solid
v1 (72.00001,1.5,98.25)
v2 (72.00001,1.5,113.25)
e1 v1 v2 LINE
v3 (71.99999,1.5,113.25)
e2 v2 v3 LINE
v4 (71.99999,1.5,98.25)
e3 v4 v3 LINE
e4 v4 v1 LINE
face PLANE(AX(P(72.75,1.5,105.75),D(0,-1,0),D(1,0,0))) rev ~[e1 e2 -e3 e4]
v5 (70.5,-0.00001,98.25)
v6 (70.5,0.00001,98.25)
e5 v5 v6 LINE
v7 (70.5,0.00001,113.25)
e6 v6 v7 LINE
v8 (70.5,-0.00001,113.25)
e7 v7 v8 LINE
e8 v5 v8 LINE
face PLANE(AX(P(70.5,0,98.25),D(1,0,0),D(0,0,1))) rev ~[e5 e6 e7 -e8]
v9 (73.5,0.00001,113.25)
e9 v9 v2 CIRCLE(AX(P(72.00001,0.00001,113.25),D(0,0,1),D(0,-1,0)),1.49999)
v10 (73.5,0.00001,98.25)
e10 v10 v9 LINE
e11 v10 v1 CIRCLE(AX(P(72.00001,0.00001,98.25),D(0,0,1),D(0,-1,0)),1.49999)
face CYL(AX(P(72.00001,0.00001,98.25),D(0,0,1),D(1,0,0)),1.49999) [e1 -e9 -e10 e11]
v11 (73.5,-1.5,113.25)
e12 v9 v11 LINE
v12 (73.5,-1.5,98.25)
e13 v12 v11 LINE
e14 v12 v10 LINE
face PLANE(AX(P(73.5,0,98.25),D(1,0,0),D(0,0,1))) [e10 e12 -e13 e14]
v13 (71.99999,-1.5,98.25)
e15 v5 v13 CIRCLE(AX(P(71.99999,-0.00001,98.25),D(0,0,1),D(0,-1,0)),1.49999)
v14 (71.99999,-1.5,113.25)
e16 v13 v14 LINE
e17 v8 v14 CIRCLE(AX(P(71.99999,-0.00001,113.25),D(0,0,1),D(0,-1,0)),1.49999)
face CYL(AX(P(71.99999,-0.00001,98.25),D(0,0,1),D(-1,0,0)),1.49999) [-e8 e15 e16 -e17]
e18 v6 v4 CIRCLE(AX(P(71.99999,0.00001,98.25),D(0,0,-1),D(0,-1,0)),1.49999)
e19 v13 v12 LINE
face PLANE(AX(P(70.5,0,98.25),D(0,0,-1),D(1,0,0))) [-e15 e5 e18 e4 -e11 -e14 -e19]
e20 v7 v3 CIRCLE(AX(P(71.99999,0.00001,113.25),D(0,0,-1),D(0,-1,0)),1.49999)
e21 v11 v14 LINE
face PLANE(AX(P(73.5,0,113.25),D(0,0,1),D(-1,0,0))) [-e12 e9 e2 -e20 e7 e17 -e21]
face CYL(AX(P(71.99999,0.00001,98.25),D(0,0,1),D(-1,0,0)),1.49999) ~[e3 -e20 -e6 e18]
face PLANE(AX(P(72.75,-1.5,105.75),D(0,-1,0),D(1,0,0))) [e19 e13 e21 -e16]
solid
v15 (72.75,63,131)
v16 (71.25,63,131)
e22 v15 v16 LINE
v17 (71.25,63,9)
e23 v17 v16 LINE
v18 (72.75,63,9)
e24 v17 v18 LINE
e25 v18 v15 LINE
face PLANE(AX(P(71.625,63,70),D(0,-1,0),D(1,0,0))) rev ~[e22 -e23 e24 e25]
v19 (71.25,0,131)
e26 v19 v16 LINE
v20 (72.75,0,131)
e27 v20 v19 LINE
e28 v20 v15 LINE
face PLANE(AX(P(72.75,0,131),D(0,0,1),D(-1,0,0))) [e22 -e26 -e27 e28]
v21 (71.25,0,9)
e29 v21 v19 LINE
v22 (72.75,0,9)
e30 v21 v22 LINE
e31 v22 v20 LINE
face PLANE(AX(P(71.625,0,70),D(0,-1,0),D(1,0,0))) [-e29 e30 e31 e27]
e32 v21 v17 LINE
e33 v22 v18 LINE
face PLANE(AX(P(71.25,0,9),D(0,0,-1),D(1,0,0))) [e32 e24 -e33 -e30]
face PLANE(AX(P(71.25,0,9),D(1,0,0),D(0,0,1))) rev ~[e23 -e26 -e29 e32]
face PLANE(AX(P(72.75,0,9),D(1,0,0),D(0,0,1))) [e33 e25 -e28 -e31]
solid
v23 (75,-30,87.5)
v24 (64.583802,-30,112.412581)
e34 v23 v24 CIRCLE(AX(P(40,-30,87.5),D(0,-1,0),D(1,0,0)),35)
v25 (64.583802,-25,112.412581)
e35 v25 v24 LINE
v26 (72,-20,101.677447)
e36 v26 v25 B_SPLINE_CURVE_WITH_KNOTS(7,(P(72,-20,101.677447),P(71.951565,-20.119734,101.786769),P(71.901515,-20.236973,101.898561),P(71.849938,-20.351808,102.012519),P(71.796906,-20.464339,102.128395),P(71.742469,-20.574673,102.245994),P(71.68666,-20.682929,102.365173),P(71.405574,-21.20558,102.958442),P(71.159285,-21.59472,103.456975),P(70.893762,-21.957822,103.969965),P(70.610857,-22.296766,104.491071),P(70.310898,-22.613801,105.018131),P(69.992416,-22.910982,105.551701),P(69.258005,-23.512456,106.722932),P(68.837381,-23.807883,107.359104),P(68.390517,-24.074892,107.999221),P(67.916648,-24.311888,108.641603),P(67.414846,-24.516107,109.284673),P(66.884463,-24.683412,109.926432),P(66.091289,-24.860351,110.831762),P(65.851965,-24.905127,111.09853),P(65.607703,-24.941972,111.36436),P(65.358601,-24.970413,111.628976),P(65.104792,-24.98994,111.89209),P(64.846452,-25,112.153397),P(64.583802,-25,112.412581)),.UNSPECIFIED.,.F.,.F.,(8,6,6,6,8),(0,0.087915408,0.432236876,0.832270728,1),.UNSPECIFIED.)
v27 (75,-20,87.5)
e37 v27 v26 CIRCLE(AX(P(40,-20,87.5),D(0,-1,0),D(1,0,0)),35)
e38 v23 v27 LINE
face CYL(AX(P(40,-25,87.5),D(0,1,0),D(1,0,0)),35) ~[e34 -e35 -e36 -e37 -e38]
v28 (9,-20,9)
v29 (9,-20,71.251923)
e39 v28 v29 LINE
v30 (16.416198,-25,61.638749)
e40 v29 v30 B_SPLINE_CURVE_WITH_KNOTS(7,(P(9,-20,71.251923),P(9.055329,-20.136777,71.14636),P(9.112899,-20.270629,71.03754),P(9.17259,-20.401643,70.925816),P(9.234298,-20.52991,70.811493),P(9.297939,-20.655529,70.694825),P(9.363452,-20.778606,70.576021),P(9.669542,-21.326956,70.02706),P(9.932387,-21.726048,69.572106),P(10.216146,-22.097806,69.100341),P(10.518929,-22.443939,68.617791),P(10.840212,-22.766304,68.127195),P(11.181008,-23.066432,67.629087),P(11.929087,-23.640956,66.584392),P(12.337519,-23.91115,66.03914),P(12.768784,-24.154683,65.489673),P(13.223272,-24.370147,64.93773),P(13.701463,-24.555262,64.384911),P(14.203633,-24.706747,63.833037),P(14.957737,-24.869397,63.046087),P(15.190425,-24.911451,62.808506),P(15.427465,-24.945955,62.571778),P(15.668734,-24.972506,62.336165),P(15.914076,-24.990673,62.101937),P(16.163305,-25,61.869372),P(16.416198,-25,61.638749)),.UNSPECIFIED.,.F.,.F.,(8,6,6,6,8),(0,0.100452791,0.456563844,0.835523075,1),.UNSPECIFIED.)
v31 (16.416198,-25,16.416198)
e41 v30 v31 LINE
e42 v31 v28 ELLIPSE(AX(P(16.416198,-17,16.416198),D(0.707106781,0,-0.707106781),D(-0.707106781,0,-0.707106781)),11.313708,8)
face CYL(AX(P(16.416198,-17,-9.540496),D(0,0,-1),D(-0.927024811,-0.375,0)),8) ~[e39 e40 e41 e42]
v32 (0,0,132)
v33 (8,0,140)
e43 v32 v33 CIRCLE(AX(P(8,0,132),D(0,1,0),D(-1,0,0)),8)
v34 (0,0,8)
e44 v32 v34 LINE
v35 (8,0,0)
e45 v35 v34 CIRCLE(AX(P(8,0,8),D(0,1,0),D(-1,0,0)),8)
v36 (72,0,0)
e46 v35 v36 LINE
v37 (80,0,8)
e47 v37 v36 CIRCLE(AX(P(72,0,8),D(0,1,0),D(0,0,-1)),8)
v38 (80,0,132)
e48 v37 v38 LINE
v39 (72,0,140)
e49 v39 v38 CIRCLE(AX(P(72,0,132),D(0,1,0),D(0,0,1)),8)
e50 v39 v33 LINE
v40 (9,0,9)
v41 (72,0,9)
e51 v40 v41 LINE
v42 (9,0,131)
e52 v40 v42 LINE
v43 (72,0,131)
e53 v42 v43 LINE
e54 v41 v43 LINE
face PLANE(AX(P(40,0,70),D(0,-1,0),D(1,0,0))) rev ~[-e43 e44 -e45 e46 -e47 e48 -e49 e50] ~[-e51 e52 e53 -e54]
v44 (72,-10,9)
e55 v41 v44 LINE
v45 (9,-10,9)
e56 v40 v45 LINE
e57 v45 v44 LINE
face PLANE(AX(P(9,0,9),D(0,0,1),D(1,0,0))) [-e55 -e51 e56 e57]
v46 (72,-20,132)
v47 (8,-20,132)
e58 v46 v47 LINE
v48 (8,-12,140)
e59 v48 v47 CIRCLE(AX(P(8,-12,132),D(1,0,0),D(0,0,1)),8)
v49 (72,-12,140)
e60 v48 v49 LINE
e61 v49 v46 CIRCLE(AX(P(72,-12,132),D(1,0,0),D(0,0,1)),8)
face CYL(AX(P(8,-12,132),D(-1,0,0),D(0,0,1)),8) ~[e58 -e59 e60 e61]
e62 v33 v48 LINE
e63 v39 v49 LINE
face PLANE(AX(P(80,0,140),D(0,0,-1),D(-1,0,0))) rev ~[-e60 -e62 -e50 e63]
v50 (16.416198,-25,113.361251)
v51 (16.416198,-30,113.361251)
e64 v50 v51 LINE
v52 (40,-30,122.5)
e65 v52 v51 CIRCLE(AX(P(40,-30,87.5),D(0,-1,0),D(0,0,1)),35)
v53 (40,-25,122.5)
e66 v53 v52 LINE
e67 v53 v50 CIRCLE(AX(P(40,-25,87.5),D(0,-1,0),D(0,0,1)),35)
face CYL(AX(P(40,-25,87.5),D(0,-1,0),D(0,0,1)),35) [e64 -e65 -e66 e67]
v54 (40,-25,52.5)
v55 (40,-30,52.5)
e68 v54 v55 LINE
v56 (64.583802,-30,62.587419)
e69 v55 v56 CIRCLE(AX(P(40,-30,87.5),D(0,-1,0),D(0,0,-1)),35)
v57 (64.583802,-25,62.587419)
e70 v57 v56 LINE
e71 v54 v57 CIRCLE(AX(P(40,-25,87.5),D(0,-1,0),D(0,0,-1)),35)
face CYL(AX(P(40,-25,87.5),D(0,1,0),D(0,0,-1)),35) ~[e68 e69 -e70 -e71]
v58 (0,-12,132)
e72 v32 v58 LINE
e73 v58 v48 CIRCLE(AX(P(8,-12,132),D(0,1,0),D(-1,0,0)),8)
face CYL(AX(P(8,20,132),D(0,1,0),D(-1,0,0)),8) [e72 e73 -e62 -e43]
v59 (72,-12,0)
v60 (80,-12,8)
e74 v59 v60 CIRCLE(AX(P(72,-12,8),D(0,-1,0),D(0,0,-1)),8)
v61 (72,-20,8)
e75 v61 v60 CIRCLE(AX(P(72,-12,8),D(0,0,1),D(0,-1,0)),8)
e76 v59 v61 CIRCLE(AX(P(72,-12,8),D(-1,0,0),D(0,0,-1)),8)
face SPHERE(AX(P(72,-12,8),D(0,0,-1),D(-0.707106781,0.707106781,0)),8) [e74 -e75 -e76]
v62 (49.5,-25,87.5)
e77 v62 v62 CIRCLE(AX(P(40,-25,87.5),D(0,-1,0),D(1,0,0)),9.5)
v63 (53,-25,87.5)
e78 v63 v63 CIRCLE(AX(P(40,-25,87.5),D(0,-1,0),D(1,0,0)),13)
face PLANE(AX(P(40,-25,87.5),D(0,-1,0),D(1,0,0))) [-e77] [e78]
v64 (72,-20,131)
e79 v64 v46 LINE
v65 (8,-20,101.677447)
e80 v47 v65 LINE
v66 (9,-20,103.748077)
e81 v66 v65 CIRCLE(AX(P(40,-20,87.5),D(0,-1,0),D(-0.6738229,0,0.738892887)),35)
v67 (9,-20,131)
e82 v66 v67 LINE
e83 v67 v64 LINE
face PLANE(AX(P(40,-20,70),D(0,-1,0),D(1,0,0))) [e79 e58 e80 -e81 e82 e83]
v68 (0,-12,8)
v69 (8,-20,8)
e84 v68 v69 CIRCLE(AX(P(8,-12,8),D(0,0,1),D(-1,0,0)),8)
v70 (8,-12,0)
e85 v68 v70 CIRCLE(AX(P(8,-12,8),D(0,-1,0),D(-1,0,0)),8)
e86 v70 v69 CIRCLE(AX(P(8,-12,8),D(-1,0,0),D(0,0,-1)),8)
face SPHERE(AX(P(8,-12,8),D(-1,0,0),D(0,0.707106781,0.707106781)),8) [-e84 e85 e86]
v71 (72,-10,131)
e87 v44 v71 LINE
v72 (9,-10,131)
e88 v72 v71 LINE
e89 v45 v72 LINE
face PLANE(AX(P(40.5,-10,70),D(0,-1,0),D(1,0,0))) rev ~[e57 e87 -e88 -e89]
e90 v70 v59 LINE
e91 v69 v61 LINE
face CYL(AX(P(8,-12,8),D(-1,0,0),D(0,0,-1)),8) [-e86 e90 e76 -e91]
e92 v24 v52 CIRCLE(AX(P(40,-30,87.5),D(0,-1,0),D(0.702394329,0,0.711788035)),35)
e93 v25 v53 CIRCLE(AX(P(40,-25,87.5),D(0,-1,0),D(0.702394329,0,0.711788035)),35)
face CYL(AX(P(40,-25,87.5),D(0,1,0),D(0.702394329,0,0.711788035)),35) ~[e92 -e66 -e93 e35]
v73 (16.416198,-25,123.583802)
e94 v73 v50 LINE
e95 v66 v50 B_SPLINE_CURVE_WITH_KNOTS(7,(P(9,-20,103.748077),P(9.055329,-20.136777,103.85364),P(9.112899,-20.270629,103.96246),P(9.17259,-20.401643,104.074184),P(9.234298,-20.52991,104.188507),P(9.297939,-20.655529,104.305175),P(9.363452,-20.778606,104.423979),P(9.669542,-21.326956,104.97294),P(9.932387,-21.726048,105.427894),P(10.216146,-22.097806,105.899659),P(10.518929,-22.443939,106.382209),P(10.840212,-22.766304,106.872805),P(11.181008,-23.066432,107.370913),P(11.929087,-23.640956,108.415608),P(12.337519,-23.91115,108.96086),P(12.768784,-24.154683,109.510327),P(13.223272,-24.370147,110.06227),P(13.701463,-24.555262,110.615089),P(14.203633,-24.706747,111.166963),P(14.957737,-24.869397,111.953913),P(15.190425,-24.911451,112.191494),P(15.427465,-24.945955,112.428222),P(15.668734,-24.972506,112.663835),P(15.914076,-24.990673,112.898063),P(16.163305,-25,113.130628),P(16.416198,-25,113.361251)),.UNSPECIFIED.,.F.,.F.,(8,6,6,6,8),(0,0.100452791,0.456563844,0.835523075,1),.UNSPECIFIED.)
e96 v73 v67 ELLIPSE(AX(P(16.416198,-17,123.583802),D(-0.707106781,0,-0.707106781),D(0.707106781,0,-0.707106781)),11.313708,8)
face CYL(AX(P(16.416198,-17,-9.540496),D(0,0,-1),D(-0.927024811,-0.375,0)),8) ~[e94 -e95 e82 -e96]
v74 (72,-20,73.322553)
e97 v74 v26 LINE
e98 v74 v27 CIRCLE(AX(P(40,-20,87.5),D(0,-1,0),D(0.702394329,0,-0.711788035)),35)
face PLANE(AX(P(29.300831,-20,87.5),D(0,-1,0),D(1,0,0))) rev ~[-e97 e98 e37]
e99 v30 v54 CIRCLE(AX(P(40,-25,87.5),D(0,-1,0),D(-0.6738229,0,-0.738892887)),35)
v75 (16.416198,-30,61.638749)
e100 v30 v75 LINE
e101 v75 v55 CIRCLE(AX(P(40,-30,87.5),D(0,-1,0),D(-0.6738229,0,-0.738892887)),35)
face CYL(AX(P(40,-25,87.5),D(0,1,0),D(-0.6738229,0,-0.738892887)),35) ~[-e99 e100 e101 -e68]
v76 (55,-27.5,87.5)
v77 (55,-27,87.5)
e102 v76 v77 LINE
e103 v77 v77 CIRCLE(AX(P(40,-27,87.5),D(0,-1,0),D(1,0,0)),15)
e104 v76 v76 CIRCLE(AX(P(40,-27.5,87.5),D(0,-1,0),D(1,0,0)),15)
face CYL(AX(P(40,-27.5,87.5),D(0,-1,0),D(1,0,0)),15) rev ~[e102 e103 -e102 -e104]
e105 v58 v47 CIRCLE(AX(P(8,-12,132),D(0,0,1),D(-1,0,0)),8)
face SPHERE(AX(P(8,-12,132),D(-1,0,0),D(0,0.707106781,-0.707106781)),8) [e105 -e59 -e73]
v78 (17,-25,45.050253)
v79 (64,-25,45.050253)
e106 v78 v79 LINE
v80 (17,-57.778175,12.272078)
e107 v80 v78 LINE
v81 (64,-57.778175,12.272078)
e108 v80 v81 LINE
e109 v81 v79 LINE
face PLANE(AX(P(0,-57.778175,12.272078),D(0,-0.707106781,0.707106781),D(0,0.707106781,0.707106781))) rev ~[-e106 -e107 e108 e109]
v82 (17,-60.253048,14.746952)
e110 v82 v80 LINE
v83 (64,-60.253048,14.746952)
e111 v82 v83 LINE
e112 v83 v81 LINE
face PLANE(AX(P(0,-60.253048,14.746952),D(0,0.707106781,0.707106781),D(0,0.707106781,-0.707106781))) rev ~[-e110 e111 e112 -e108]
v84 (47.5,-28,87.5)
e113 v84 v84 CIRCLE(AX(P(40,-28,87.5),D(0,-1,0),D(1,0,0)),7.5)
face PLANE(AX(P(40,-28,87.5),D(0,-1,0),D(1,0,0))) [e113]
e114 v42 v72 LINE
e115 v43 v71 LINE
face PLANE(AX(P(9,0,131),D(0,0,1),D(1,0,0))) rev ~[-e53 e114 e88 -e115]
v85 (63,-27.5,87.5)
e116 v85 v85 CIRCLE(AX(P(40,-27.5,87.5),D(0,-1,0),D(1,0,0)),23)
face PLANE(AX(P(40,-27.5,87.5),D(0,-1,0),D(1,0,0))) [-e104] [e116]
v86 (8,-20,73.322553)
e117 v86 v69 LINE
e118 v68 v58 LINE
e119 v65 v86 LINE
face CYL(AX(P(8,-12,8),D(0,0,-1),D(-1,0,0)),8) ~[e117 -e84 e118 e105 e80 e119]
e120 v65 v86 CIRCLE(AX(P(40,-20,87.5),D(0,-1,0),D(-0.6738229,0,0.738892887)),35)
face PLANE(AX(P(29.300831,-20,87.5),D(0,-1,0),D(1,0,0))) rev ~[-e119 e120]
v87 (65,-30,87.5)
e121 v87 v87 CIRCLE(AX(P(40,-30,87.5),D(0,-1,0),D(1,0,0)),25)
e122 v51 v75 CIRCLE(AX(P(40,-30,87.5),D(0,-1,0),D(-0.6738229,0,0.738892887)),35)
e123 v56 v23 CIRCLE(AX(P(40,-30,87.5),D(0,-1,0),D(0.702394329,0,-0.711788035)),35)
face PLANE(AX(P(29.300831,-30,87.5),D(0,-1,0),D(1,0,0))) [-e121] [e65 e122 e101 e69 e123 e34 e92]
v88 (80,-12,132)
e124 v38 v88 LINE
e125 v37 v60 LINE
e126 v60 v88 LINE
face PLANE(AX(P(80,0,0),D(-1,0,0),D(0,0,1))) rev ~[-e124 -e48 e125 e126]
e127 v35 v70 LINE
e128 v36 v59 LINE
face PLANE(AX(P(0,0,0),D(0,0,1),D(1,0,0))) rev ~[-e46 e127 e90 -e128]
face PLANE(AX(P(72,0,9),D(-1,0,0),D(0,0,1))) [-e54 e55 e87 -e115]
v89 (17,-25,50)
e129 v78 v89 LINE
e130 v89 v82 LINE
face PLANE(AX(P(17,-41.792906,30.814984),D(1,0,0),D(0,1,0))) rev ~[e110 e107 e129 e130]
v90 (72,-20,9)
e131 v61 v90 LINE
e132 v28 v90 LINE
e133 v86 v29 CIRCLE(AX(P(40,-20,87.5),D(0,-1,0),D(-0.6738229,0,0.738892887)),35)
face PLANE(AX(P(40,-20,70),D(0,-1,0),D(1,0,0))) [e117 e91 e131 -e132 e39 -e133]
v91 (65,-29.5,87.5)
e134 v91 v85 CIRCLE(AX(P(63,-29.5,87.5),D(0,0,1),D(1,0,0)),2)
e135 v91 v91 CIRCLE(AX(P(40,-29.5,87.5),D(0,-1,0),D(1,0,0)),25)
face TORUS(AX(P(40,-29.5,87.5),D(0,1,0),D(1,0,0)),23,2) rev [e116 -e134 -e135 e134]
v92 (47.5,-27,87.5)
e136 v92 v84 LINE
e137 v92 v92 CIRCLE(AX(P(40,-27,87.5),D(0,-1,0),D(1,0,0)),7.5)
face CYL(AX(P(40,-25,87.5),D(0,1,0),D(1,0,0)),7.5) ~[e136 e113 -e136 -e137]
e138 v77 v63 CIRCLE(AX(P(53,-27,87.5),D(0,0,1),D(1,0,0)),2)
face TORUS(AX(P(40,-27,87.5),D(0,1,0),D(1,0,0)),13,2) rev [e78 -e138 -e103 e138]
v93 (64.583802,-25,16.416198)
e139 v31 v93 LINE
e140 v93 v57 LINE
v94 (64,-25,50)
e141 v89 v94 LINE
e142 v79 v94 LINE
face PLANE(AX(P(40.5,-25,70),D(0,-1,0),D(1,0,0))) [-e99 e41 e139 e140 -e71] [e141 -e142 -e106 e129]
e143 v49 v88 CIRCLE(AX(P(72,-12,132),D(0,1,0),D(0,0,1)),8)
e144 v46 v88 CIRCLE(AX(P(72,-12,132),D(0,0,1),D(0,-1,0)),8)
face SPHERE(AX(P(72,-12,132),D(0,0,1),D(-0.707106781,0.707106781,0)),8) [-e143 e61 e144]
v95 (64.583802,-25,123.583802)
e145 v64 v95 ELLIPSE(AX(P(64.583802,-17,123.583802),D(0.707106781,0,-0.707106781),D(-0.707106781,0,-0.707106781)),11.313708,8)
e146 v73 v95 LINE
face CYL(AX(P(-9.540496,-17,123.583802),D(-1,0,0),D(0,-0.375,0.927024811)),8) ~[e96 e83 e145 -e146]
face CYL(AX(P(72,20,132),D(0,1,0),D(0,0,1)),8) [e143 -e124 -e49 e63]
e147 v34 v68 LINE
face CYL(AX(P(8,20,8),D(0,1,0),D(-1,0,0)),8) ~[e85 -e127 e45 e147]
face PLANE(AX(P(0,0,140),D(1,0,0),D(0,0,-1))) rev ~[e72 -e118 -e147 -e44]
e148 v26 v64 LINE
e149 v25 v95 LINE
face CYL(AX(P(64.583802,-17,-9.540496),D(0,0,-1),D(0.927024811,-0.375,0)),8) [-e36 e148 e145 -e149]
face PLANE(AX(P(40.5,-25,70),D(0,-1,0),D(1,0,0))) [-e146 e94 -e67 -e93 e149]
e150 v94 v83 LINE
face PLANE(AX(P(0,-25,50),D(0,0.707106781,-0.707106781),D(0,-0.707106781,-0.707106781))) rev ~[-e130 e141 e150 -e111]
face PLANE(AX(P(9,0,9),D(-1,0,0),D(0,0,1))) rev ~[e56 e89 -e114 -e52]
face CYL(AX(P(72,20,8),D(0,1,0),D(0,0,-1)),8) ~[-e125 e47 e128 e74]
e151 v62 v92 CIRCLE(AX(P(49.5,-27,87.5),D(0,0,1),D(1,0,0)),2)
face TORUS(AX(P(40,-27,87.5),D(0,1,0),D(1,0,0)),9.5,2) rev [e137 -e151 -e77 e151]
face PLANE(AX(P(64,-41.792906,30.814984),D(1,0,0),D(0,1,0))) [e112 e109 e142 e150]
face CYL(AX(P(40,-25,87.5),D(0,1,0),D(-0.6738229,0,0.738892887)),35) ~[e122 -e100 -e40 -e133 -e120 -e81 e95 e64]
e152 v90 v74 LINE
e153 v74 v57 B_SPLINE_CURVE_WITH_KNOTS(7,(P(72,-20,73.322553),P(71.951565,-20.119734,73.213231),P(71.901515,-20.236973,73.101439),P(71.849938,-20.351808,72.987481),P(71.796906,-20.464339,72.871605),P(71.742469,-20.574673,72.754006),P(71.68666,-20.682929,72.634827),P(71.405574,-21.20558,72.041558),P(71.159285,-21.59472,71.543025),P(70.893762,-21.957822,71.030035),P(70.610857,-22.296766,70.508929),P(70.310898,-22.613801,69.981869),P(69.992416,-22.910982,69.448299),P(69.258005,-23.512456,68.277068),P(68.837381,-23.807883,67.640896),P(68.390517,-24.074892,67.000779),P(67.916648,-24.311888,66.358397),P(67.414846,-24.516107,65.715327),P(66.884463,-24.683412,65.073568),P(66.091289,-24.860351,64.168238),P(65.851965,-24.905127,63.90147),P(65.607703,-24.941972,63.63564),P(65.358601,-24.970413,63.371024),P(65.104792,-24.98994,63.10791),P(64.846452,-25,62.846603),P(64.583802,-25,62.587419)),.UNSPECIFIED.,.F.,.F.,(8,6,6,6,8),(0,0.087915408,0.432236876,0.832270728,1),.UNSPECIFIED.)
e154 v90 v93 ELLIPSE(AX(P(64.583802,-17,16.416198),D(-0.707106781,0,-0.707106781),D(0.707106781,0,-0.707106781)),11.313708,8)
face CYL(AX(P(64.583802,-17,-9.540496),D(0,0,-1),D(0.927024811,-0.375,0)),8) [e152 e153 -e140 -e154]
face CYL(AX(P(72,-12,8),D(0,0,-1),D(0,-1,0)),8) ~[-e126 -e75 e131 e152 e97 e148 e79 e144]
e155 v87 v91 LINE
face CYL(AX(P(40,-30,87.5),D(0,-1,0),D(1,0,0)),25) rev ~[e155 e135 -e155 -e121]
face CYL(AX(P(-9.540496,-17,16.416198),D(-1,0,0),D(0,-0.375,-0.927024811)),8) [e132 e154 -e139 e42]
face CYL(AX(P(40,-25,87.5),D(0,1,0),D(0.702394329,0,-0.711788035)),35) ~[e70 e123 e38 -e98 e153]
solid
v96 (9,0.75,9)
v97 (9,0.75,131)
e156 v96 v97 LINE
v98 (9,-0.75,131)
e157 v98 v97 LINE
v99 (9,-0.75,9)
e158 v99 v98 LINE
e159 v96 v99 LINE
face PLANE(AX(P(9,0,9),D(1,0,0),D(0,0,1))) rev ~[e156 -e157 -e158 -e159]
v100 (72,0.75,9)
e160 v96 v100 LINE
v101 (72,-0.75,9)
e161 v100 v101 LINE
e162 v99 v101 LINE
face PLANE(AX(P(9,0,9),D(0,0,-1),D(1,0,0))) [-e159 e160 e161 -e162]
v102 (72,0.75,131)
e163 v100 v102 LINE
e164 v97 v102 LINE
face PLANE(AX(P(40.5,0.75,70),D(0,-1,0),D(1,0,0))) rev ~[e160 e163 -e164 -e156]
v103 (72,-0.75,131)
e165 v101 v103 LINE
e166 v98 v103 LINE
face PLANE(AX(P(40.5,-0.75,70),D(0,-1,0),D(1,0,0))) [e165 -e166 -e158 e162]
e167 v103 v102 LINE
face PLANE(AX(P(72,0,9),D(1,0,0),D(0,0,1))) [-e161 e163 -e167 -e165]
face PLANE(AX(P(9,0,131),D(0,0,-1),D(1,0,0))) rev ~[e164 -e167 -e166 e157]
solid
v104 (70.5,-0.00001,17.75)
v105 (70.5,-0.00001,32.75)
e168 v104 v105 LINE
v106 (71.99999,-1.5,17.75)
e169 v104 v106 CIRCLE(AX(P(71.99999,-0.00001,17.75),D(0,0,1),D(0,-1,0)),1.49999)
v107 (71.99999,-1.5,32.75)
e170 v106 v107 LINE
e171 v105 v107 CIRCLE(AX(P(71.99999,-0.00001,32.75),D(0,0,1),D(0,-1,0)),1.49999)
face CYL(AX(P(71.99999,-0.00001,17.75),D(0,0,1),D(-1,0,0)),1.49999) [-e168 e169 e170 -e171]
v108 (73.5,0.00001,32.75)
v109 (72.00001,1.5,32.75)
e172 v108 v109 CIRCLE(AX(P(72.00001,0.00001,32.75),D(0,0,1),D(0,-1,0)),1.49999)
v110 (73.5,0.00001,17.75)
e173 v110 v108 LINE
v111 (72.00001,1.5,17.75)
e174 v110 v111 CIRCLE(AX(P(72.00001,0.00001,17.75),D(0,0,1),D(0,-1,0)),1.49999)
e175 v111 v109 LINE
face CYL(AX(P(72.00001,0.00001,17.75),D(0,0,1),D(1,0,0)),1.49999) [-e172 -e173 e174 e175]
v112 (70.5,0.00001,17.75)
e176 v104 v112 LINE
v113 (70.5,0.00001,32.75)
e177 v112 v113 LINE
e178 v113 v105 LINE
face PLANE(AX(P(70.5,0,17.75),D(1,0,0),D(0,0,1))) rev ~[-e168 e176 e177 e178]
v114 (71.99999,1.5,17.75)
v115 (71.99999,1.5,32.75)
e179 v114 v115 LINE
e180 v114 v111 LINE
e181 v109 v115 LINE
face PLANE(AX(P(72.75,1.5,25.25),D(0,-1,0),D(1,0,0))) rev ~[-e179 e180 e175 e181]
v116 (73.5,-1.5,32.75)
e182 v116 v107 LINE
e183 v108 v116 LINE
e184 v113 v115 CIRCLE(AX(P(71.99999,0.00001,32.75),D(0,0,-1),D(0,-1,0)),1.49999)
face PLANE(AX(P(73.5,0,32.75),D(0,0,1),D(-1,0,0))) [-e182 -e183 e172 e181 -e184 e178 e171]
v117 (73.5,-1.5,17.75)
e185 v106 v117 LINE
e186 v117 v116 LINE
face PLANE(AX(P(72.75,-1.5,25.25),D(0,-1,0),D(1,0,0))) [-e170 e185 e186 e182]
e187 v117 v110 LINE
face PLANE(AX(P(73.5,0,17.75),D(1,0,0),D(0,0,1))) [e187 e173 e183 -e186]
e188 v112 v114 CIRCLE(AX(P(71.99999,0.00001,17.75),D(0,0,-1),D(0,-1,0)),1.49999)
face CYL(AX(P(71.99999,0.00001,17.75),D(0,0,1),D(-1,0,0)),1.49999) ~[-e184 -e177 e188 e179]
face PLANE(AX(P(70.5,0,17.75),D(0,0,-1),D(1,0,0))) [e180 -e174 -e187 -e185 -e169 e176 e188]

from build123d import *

# Parameters (mm, degrees)
F0_W         = 63
F0_H         = 122
F1_DEPTH     = 20
F2_DEPTH     = 25
F3_DEPTH     = 10
F4_T1_DEPTH  = 32
F4_T3_DEPTH  = 64
F4_T5_DEPTH  = 124
F4_T7_DEPTH  = 159.0809924355
F4_T9_DEPTH  = 100.0809924355
F4_S13_W     = 8.16
F4_S13_H     = 8.16
F4_T14_DEPTH = 8.16
F4_S19_W     = 8.16
F4_S19_H     = 8.16
F4_T20_DEPTH = 8.16
F4_S25_W     = 8.16
F4_S25_H     = 8.16
F4_T26_DEPTH = 8.16
F4_S31_W     = 8.16
F4_S31_H     = 8.16
F4_T32_DEPTH = 8.16
F5_W         = 1.5
F5_H         = 15
F6_DEPTH     = 1.5
F7_R         = 1.49999
F7_2_R       = 1.49999
F8_W         = 0.75
F8_H         = 122
F9_DEPTH     = 63
F10_W        = 63
F10_H        = 122
F11_DEPTH    = 0.75
F13_DEPTH    = 64
F14_DEPTH    = 17
F16_DEPTH    = 5
F17_R        = 25
F18_DEPTH    = 2.5
F19_R        = 15
F20_DEPTH    = 2.5
F21_R        = 7.5
F22_DEPTH    = 3
F23_R        = 2


# Not quite as in the source:
# - a fillet or chamfer that OpenCascade refuses, or shapes differently, is made with other operations: its cross-section is extruded or revolved along the edge and cut away or added
# - a fillet or chamfer is up to 0.001 mm smaller than in the source, because OpenCascade refuses the exact size


with BuildPart() as f1:
    # F0 (on Front) → F1 (new body)
    with BuildSketch(Plane.XZ):
        Polygon((0, 140), (0, 0), (9, 0), (80, 0), (80, 140), align=None)
        with Locations((40.5, 70)):
            Rectangle(F0_W, F0_H, mode=Mode.SUBTRACT)
    extrude(amount=F1_DEPTH)

    # F0 (on Front) → F2 (join)
    with BuildSketch(Plane.XZ):
        with Locations((40.5, 70)):
            Rectangle(F0_W, F0_H)
    extrude(amount=F2_DEPTH)

    # F0 (on Front) → F3 (cut)
    with BuildSketch(Plane.XZ):
        with Locations((40.5, 70)):
            Rectangle(F0_W, F0_H)
    extrude(amount=F3_DEPTH, mode=Mode.SUBTRACT)

    # F4: fillet of radius 8 on 12 edges, made by hand

    # F4_s2 → F4_t1 (cut)
    with BuildSketch(Plane.XZ.offset(-20)):
        with BuildLine():
            ThreePointArc((0, 8), (2.3431457505, 2.3431457505), (8, 0))
            Line((8, 0), (8, -0.16))
            Line((8, -0.16), (-0.16, -0.16))
            Line((-0.16, -0.16), (-0.16, 8))
            Line((-0.16, 8), (0, 8))
        make_face()
        with BuildLine():
            ThreePointArc((72, 0), (77.6568542495, 2.3431457505), (80, 8))
            Line((80, 8), (80.16, 8))
            Line((80.16, 8), (80.16, -0.16))
            Line((80.16, -0.16), (72, -0.16))
            Line((72, -0.16), (72, 0))
        make_face()
        with BuildLine():
            ThreePointArc((0, 132), (2.3431457505, 137.6568542495), (8, 140))
            Line((8, 140), (8, 140.16))
            Line((8, 140.16), (-0.16, 140.16))
            Line((-0.16, 140.16), (-0.16, 132))
            Line((-0.16, 132), (0, 132))
        make_face()
        with BuildLine():
            ThreePointArc((72, 140), (77.6568542495, 137.6568542495), (80, 132))
            Line((80, 132), (80.16, 132))
            Line((80.16, 132), (80.16, 140.16))
            Line((80.16, 140.16), (72, 140.16))
            Line((72, 140.16), (72, 140))
        make_face()
    extrude(amount=F4_T1_DEPTH, mode=Mode.SUBTRACT)

    # F4_s4 → F4_t3 (cut)
    with BuildSketch(Plane.YZ.offset(8)):
        with BuildLine():
            ThreePointArc((-12, 140), (-17.6568542495, 137.6568542495), (-20, 132))
            Line((-20, 132), (-20.16, 132))
            Line((-20.16, 132), (-20.16, 140.16))
            Line((-20.16, 140.16), (-12, 140.16))
            Line((-12, 140.16), (-12, 140))
        make_face()
        with BuildLine():
            ThreePointArc((-12, 0), (-17.6568542495, 2.3431457505), (-20, 8))
            Line((-20, 8), (-20.16, 8))
            Line((-20.16, 8), (-20.16, -0.16))
            Line((-20.16, -0.16), (-12, -0.16))
            Line((-12, -0.16), (-12, 0))
        make_face()
    extrude(amount=F4_T3_DEPTH, mode=Mode.SUBTRACT)

    # F4_s6 → F4_t5 (cut)
    with BuildSketch(Plane.XY.offset(8)):
        with BuildLine():
            ThreePointArc((0, -12), (2.3431457505, -17.6568542495), (8, -20))
            Line((8, -20), (8, -20.16))
            Line((8, -20.16), (-0.16, -20.16))
            Line((-0.16, -20.16), (-0.16, -12))
            Line((-0.16, -12), (0, -12))
        make_face()
        with BuildLine():
            ThreePointArc((72, -20), (77.6568542495, -17.6568542495), (80, -12))
            Line((80, -12), (80.16, -12))
            Line((80.16, -12), (80.16, -20.16))
            Line((80.16, -20.16), (72, -20.16))
            Line((72, -20.16), (72, -20))
        make_face()
    extrude(amount=F4_T5_DEPTH, mode=Mode.SUBTRACT)

    # F4_s8 → F4_t7 (cut)
    with BuildSketch(Plane.XY.offset(-9.5404962177)):
        with BuildLine():
            ThreePointArc((72, -20), (69.0559374679, -23.6332495807), (64.5838015129, -25))
            Line((64.5838015129, -25), (64.5838015129, -25.16))
            Line((64.5838015129, -25.16), (72, -25.16))
            Line((72, -25.16), (72.16, -25))
            ThreePointArc((72.16, -25), (72.16, -22.5), (72.1483239697, -20.06))
            Line((72.1483239697, -20.06), (72, -20))
        make_face()
        with BuildLine():
            ThreePointArc((9, -20), (11.9440625321, -23.6332495807), (16.4161984871, -25))
            Line((16.4161984871, -25), (16.4161984871, -25.16))
            Line((16.4161984871, -25.16), (9, -25.16))
            Line((9, -25.16), (8.84, -25))
            ThreePointArc((8.84, -25), (8.84, -22.5), (8.8516760303, -20.06))
            Line((8.8516760303, -20.06), (9, -20))
        make_face()
    extrude(amount=F4_T7_DEPTH, mode=Mode.SUBTRACT)

    # F4_s10 → F4_t9 (cut)
    with BuildSketch(Plane.YZ.offset(-9.5404962177)):
        with BuildLine():
            ThreePointArc((-20, 131), (-23.6332495807, 128.0559374679), (-25, 123.5838015129))
            Line((-25, 123.5838015129), (-25.16, 123.5838015129))
            Line((-25.16, 123.5838015129), (-25.16, 131))
            Line((-25.16, 131), (-25, 131.16))
            ThreePointArc((-25, 131.16), (-22.5, 131.16), (-20.06, 131.1483239697))
            Line((-20.06, 131.1483239697), (-20, 131))
        make_face()
        with BuildLine():
            ThreePointArc((-20, 9), (-23.6332495807, 11.9440625321), (-25, 16.4161984871))
            Line((-25, 16.4161984871), (-25.16, 16.4161984871))
            Line((-25.16, 16.4161984871), (-25.16, 9))
            Line((-25.16, 9), (-25, 8.84))
            ThreePointArc((-25, 8.84), (-22.5, 8.84), (-20.06, 8.8516760303))
            Line((-20.06, 8.8516760303), (-20, 9))
        make_face()
    extrude(amount=F4_T9_DEPTH, mode=Mode.SUBTRACT)


with BuildPart() as f4_tool12:
    # F4_s13 → F4_t14 (new body)
    with BuildSketch(Plane.YZ.offset(8)):
        with Locations((-16.08, 3.92)):
            Rectangle(F4_S13_W, F4_S13_H)
    extrude(amount=-F4_T14_DEPTH)

    # F4_s15 → F4_t16 (revolve, cut)
    with BuildSketch(Plane(origin=(8, -12, 8), x_dir=(0, 0.7071067812, 0.7071067812), z_dir=(0, -0.7071067812, 0.7071067812))):
        with BuildLine():
            ThreePointArc((0, -8), (8, 0), (0, 8))
            Line((0, 8), (0, -8))
        make_face()
    revolve(axis=Axis((8, -12, 8), (-1, 0, 0)), mode=Mode.SUBTRACT)


with BuildPart() as f1_1:
    add(f1.part)

    # F4_t11: cut F4_tool12
    add(f4_tool12.part, mode=Mode.SUBTRACT)


with BuildPart() as f4_tool18:
    # F4_s19 → F4_t20 (new body)
    with BuildSketch(Plane.XY.offset(8)):
        with Locations((76.08, -16.08)):
            Rectangle(F4_S19_W, F4_S19_H)
    extrude(amount=-F4_T20_DEPTH)

    # F4_s21 → F4_t22 (revolve, cut)
    with BuildSketch(Plane(origin=(72, -12, 8), x_dir=(-0.7071067812, 0.7071067812, 0), z_dir=(-0.7071067812, -0.7071067812, 0))):
        with BuildLine():
            ThreePointArc((0, -8), (8, 0), (0, 8))
            Line((0, 8), (0, -8))
        make_face()
    revolve(axis=Axis((72, -12, 8), (0, 0, -1)), mode=Mode.SUBTRACT)


with BuildPart() as f1_2:
    add(f1_1.part)

    # F4_t17: cut F4_tool18
    add(f4_tool18.part, mode=Mode.SUBTRACT)


with BuildPart() as f4_tool24:
    # F4_s25 → F4_t26 (new body)
    with BuildSketch(Plane.YZ.offset(8)):
        with Locations((-16.08, 136.08)):
            Rectangle(F4_S25_W, F4_S25_H)
    extrude(amount=-F4_T26_DEPTH)

    # F4_s27 → F4_t28 (revolve, cut)
    with BuildSketch(Plane(origin=(8, -12, 132), x_dir=(0, 0.7071067812, -0.7071067812), z_dir=(0, 0.7071067812, 0.7071067812))):
        with BuildLine():
            ThreePointArc((0, -8), (8, 0), (0, 8))
            Line((0, 8), (0, -8))
        make_face()
    revolve(axis=Axis((8, -12, 132), (-1, 0, 0)), mode=Mode.SUBTRACT)


with BuildPart() as f1_3:
    add(f1_2.part)

    # F4_t23: cut F4_tool24
    add(f4_tool24.part, mode=Mode.SUBTRACT)


with BuildPart() as f4_tool30:
    # F4_s31 → F4_t32 (new body)
    with BuildSketch(Plane.XY.offset(132)):
        with Locations((76.08, -16.08)):
            Rectangle(F4_S31_W, F4_S31_H)
    extrude(amount=F4_T32_DEPTH)

    # F4_s33 → F4_t34 (revolve, cut)
    with BuildSketch(Plane(origin=(72, -12, 132), x_dir=(-0.7071067812, 0.7071067812, 0), z_dir=(0.7071067812, 0.7071067812, 0))):
        with BuildLine():
            ThreePointArc((0, -8), (8, 0), (0, 8))
            Line((0, 8), (0, -8))
        make_face()
    revolve(axis=Axis((72, -12, 132), (0, 0, 1)), mode=Mode.SUBTRACT)


with BuildPart() as f1_4:
    add(f1_3.part)

    # F4_t29: cut F4_tool30
    add(f4_tool30.part, mode=Mode.SUBTRACT)

    # F12 (on Right) → F13 (join)
    with BuildSketch(Plane.YZ):
        Polygon((-57.7781745931, 12.2720779386), (-25, 45.0502525317), (-25, 50), (-50, 25), (-60.2530483272, 14.7469516728), align=None)
    extrude(amount=F13_DEPTH)

    # F14 (cut): a face of the model
    f14_faces = [f1_4.faces().sort_by_distance(p)[0] for p in [
        (0, -42.0153084126, 30.5398285833),
    ]]
    extrude(f14_faces, amount=-F14_DEPTH, mode=Mode.SUBTRACT)

    # F15 (on face) → F16 (join, symmetric)
    with BuildSketch(Plane.XZ.offset(25)):
        with BuildLine():
            Line((40, 52.5), (40, 70))
            Line((40, 70), (40, 87.5))
            Line((40, 87.5), (40, 105))
            Line((40, 105), (40, 122.5))
            ThreePointArc((40, 122.5), (27.3537315182, 120.1354392262), (16.4161984871, 113.3612510564))
            Line((16.4161984871, 113.3612510564), (16.4161984871, 61.6387489436))
            ThreePointArc((16.4161984871, 61.6387489436), (27.3537315182, 54.8645607738), (40, 52.5))
        make_face()
        with BuildLine():
            Line((40, 87.5), (40, 70))
            Line((40, 70), (40, 52.5))
            ThreePointArc((40, 52.5), (53.2864528225, 55.1199108804), (64.5838015129, 62.5874187774))
            Line((64.5838015129, 62.5874187774), (64.5838015129, 112.4125812226))
            ThreePointArc((64.5838015129, 112.4125812226), (53.2864528225, 119.8800891196), (40, 122.5))
            Line((40, 122.5), (40, 105))
            Line((40, 105), (40, 87.5))
        make_face()
        with BuildLine():
            ThreePointArc((16.4161984871, 113.3612510564), (5, 87.5), (16.4161984871, 61.6387489436))
            Line((16.4161984871, 61.6387489436), (16.4161984871, 113.3612510564))
        make_face()
        with BuildLine():
            Line((64.5838015129, 112.4125812226), (64.5838015129, 62.5874187774))
            ThreePointArc((64.5838015129, 62.5874187774), (72.2911214806, 73.9987602968), (75, 87.5))
            ThreePointArc((75, 87.5), (72.2911214806, 101.0012397032), (64.5838015129, 112.4125812226))
        make_face()
    extrude(amount=F16_DEPTH, both=True)

    # F17 (on face) → F18 (cut)
    with BuildSketch(Plane.XZ.offset(30)):
        with Locations((40, 87.5)):
            Circle(F17_R)
    extrude(amount=-F18_DEPTH, mode=Mode.SUBTRACT)

    # F19 (on face) → F20 (cut)
    with BuildSketch(Plane.XZ.offset(27.5)):
        with Locations((40, 87.5)):
            Circle(F19_R)
    extrude(amount=-F20_DEPTH, mode=Mode.SUBTRACT)

    # F21 (on face) → F22 (join)
    with BuildSketch(Plane.XZ.offset(25)):
        with Locations((40, 87.5)):
            Circle(F21_R)
    extrude(amount=F22_DEPTH)

    # F23
    f23_edges = [f1_4.edges().sort_by_distance(p)[0] for p in [
        (15, -27.5, 87.5),
        (25, -25, 87.5),
        (32.5, -25, 87.5),
    ]]
    fillet(f23_edges, radius=F23_R)


with BuildPart() as f6:
    # F5 (on face) → F6 (new body, symmetric)
    with BuildSketch(Plane.XZ):
        with Locations((72.75, 105.75)):
            Rectangle(F5_W, F5_H)
        with Locations((71.25, 105.75)):
            Rectangle(F5_W, F5_H)
    extrude(amount=F6_DEPTH, both=True)

    # F7 (radius 1.5 in the source; OpenCascade refuses exactly that, so slightly less here)
    f7_edges = [f6.edges().sort_by_distance(p)[0] for p in [
        (73.5, 1.5, 105.75),
        (70.5, 1.5, 105.75),
        (70.5, -1.5, 105.75),
    ]]
    fillet(f7_edges, radius=F7_R)


with BuildPart() as f6b:
    # F5 (on face) → F6, piece 2 (new body, symmetric)
    with BuildSketch(Plane.XZ):
        with Locations((72.75, 25.25)):
            Rectangle(F5_W, F5_H)
        with Locations((71.25, 25.25)):
            Rectangle(F5_W, F5_H)
    extrude(amount=F6_DEPTH, both=True)

    # F7#2 (radius 1.5 in the source; OpenCascade refuses exactly that, so slightly less here)
    f7_2_edges = [f6b.edges().sort_by_distance(p)[0] for p in [
        (73.5, 1.5, 25.25),
        (70.5, 1.5, 25.25),
        (70.5, -1.5, 25.25),
    ]]
    fillet(f7_2_edges, radius=F7_2_R)


with BuildPart() as f9:
    # F8 (on Front) → F9 (new body)
    with BuildSketch(Plane.XZ):
        with Locations((71.625, 70)):
            Rectangle(F8_W, F8_H)
        with Locations((72.375, 70)):
            Rectangle(F8_W, F8_H)
    extrude(amount=-F9_DEPTH)


with BuildPart() as f11:
    # F10 (on Front) → F11 (new body, symmetric)
    with BuildSketch(Plane.XZ):
        with Locations((40.5, 70)):
            Rectangle(F10_W, F10_H)
    extrude(amount=F11_DEPTH, both=True)


solid = Compound([f1_4.part, f6.part, f6b.part, f9.part, f11.part])
